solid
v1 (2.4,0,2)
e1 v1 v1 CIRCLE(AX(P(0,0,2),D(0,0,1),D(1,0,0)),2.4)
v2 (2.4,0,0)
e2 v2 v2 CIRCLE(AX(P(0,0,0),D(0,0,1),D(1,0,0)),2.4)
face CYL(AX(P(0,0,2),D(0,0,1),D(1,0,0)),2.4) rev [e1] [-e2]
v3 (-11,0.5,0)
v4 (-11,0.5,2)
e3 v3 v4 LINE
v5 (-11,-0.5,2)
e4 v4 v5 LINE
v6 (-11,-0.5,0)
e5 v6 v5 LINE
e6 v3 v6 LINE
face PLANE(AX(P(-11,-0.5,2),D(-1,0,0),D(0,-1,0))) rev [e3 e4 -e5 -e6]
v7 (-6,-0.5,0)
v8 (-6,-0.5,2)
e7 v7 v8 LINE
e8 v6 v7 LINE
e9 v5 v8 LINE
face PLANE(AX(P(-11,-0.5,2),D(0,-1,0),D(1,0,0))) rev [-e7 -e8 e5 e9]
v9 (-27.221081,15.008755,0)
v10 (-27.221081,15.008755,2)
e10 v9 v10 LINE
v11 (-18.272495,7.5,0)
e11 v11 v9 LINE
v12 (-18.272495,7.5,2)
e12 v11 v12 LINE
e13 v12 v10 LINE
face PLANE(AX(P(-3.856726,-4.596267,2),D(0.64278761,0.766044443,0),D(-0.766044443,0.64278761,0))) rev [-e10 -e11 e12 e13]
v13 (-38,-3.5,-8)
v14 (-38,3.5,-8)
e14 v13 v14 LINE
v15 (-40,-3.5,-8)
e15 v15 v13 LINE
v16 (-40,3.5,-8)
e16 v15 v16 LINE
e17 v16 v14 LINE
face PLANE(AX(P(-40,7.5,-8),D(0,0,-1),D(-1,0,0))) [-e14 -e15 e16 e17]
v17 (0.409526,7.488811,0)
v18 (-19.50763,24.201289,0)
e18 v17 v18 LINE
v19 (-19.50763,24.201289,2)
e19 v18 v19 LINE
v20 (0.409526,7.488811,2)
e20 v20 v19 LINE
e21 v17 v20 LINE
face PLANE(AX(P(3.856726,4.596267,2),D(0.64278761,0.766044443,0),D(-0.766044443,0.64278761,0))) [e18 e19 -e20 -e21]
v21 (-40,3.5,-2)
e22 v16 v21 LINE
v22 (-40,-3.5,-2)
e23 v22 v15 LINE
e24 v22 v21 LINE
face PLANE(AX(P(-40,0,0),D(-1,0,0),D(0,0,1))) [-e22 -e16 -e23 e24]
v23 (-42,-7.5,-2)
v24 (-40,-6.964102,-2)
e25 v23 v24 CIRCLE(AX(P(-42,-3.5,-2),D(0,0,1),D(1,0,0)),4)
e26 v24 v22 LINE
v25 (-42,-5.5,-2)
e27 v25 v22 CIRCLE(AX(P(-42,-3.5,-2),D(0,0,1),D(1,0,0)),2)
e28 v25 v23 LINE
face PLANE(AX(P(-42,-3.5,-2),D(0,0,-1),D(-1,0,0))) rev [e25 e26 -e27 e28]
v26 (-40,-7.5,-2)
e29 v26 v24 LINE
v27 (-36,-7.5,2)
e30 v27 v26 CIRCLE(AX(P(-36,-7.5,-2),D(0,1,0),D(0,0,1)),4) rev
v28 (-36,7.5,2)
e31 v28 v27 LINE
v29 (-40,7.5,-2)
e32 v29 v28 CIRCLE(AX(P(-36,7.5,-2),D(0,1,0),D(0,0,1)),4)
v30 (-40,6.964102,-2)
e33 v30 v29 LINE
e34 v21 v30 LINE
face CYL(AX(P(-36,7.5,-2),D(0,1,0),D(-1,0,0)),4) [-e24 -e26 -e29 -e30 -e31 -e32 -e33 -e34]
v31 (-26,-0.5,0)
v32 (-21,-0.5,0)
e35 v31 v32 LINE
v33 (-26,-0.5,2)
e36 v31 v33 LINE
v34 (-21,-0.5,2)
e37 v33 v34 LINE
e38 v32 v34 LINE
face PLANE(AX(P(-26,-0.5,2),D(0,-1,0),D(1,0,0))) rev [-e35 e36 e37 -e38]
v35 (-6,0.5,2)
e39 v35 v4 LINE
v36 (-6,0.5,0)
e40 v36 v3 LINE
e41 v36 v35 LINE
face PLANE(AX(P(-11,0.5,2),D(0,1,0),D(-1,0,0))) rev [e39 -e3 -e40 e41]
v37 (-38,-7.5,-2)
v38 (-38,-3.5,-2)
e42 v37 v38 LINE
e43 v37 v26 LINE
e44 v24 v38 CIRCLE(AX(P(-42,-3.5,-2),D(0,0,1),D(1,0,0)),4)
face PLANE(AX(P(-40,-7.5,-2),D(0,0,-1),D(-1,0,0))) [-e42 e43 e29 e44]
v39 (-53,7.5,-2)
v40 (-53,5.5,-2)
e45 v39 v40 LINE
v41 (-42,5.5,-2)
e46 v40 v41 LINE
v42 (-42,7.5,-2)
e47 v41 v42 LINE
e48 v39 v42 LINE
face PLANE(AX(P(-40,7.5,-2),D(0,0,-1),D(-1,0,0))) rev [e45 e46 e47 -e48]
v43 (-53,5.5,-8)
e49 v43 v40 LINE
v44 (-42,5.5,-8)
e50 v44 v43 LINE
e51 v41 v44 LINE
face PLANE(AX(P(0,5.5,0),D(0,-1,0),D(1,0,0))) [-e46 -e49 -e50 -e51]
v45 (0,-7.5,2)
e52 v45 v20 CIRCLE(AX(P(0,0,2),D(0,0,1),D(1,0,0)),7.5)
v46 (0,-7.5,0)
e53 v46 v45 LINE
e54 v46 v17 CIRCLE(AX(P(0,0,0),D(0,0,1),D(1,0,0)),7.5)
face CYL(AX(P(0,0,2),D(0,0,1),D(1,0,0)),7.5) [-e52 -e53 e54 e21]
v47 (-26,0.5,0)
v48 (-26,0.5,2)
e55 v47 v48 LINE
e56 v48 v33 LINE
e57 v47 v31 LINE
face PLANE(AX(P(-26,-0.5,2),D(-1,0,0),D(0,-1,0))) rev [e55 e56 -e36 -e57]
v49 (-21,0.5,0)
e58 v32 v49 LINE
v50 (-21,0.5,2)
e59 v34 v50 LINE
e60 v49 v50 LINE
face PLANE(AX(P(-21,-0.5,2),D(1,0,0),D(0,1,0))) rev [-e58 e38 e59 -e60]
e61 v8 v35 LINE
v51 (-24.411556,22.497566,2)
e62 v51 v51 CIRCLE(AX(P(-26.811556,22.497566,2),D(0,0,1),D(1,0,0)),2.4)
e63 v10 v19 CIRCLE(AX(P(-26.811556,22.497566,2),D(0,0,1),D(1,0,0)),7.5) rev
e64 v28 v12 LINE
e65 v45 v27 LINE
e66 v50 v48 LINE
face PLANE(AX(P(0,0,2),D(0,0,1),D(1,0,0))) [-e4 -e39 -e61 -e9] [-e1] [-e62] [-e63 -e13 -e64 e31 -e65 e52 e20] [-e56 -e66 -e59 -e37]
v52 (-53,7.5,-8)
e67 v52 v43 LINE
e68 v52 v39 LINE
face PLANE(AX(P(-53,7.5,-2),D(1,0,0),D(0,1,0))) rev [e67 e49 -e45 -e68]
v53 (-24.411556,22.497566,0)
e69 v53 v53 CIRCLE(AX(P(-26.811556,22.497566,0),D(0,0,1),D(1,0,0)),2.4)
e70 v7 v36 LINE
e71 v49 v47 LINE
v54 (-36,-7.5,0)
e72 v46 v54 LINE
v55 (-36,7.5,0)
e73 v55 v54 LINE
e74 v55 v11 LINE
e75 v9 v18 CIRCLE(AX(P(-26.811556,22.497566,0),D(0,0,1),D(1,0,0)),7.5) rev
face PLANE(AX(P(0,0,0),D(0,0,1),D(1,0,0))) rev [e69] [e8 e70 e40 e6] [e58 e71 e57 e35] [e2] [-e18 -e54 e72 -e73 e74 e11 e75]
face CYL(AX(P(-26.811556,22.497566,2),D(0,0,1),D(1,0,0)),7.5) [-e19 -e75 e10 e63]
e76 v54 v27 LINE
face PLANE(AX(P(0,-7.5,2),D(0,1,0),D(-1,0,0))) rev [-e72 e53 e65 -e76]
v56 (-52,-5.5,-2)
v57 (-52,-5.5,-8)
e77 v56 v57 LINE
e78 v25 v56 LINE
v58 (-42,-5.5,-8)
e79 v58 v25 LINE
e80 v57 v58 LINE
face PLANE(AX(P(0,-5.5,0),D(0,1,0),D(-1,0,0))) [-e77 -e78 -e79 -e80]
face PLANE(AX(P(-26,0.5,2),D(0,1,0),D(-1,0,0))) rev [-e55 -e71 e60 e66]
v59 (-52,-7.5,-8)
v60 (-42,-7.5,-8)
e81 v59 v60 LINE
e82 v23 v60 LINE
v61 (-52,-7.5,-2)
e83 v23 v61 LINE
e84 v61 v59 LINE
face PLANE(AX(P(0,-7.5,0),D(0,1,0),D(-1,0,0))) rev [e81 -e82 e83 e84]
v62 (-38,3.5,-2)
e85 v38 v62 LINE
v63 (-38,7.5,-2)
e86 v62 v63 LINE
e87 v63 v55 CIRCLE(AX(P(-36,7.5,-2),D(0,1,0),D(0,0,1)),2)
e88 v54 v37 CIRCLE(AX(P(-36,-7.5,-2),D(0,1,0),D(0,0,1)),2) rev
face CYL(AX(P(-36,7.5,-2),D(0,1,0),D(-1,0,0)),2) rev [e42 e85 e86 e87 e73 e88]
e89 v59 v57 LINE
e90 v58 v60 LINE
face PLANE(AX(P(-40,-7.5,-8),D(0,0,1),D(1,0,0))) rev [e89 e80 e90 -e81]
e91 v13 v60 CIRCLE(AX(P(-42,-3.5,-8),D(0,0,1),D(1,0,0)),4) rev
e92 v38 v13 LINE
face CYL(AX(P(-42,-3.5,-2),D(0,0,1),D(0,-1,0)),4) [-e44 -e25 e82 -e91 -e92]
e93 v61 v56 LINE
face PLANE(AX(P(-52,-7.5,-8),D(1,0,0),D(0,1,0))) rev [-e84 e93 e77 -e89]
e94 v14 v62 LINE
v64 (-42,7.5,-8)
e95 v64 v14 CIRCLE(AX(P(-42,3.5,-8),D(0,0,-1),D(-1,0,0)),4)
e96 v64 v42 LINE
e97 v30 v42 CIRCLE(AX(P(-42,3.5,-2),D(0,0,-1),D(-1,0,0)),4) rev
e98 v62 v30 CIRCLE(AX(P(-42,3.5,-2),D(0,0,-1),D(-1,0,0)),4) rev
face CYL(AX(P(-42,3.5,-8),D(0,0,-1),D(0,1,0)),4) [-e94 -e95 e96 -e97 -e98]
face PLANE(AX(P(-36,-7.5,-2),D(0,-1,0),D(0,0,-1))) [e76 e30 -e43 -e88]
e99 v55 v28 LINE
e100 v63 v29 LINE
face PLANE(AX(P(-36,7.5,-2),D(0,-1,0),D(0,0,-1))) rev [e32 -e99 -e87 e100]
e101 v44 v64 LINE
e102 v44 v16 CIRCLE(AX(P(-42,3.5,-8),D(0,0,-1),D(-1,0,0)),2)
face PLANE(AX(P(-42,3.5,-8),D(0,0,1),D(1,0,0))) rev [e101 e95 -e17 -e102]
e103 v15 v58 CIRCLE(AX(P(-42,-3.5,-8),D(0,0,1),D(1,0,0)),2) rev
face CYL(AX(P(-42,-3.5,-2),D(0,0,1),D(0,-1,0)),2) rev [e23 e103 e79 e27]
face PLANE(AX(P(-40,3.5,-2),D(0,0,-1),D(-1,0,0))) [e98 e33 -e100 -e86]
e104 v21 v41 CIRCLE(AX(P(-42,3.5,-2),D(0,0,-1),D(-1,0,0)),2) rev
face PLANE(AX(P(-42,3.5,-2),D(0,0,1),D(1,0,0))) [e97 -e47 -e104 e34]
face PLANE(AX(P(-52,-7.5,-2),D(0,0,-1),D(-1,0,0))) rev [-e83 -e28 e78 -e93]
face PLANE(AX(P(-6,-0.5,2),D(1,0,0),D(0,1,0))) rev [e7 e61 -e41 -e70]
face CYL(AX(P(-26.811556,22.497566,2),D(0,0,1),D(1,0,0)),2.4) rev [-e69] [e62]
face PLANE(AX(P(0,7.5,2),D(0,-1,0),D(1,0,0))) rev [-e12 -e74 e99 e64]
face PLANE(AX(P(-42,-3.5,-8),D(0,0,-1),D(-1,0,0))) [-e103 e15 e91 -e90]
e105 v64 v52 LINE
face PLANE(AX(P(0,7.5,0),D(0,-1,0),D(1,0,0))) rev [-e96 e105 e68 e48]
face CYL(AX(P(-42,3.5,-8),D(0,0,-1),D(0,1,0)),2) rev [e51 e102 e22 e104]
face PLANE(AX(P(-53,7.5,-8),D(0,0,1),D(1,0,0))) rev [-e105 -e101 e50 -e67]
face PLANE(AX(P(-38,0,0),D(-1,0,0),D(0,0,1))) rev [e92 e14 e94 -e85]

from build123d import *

# Parameters (mm, degrees)
SKETCH1_R                    = 2.4
BOSS_EXTRUDE1_DEPTH          = 2
SKETCH2_W                    = 5
SKETCH2_H                    = 1
CUT_EXTRUDE1_DEPTH           = 51.038525021
EDGE_FLANGE1_STRIP_W         = 12
EDGE_FLANGE1_STRIP_H         = 2
EDGE_FLANGE1_STRIP_CUT_DEPTH = 15
EDGE_FLANGE1_DEPTH           = 15
EDGE_FLANGE2_STRIP_W         = 12
EDGE_FLANGE2_STRIP_H         = 2
EDGE_FLANGE2_STRIP_CUT_DEPTH = 6
EDGE_FLANGE2_DEPTH           = 6
EDGE_FLANGE3_STRIP_W         = 12
EDGE_FLANGE3_STRIP_H         = 2
EDGE_FLANGE3_STRIP_CUT_DEPTH = 6
EDGE_FLANGE3_DEPTH           = 6


# Sheet-metal steps are written as plain solids
with BuildPart() as part:
    # Sketch1 → Boss-Extrude1 (new body)
    with BuildSketch(Plane.XY):
        with BuildLine():
            Line((0.409525664, 7.488810902), (-19.507629857, 24.201288754))
            ThreePointArc((-19.507629857, 24.201288754), (-32.556888833, 27.318473412), (-27.221081173, 15.008755437))
            Line((-27.221081173, 15.008755437), (-18.272494906, 7.5))
            Line((-18.272494906, 7.5), (-40, 7.5))
            Line((-40, 7.5), (-40, -7.5))
            Line((-40, -7.5), (0, -7.5))
            ThreePointArc((0, -7.5), (7.497202204, -0.204839245), (0.409525664, 7.488810902))
        make_face()
        Circle(SKETCH1_R, mode=Mode.SUBTRACT)
        with Locations((-26.811555509, 22.497566339)):
            Circle(SKETCH1_R, mode=Mode.SUBTRACT)
    extrude(amount=BOSS_EXTRUDE1_DEPTH)

    # Sketch2 → Cut-Extrude1 (cut, through all)
    with BuildSketch(Plane.XY.offset(2)):
        with Locations((-23.5, 0)):
            Rectangle(SKETCH2_W, SKETCH2_H)
        with Locations((-8.5, 0)):
            Rectangle(SKETCH2_W, SKETCH2_H)
    extrude(amount=-CUT_EXTRUDE1_DEPTH, mode=Mode.SUBTRACT)

    # Edge-Flange1 strip (across the edge) → Edge-Flange1 strip cut (cut)
    with BuildSketch(Plane(origin=(-40, -7.5, 0), x_dir=(1, 0, 0), z_dir=(0, 1, 0))):
        with Locations((-2, -1)):
            Rectangle(EDGE_FLANGE1_STRIP_W, EDGE_FLANGE1_STRIP_H)
    extrude(amount=EDGE_FLANGE1_STRIP_CUT_DEPTH, mode=Mode.SUBTRACT)

    # Edge-Flange1 section (across the edge) → Edge-Flange1 (add)
    with BuildSketch(Plane(origin=(-40, -7.5, 0), x_dir=(1, 0, 0), z_dir=(0, 1, 0))):
        with BuildLine():
            Line((0, 2), (0, 8))
            Line((0, 8), (2, 8))
            Line((2, 8), (2, 2))
            ThreePointArc((2, 2), (2.585786438, 0.585786438), (4, 0))
            Line((4, 0), (4, -2))
            ThreePointArc((4, -2), (1.171572875, -0.828427125), (0, 2))
        make_face()
    extrude(amount=EDGE_FLANGE1_DEPTH)

    # Edge-Flange2 strip (across the edge) → Edge-Flange2 strip cut (cut)
    with BuildSketch(Plane(origin=(-40, 7.5, -2), x_dir=(0, -1, 0), z_dir=(0, 0, -1))):
        with Locations((-2, -1)):
            Rectangle(EDGE_FLANGE2_STRIP_W, EDGE_FLANGE2_STRIP_H)
    extrude(amount=EDGE_FLANGE2_STRIP_CUT_DEPTH, mode=Mode.SUBTRACT)

    # Edge-Flange2 section (across the edge) → Edge-Flange2 (add)
    with BuildSketch(Plane(origin=(-40, 7.5, -2), x_dir=(0, -1, 0), z_dir=(0, 0, -1))):
        with BuildLine():
            Line((0, 2), (0, 13))
            Line((0, 13), (2, 13))
            Line((2, 13), (2, 2))
            ThreePointArc((2, 2), (2.585786438, 0.585786438), (4, 0))
            Line((4, 0), (4, -2))
            ThreePointArc((4, -2), (1.171572875, -0.828427125), (0, 2))
        make_face()
    extrude(amount=EDGE_FLANGE2_DEPTH)

    # Edge-Flange3 strip (across the edge) → Edge-Flange3 strip cut (cut)
    with BuildSketch(Plane(origin=(-40, -7.5, -8), x_dir=(0, 1, 0), z_dir=(0, 0, 1))):
        with Locations((-2, -1)):
            Rectangle(EDGE_FLANGE3_STRIP_W, EDGE_FLANGE3_STRIP_H)
    extrude(amount=EDGE_FLANGE3_STRIP_CUT_DEPTH, mode=Mode.SUBTRACT)

    # Edge-Flange3 section (across the edge) → Edge-Flange3 (add)
    with BuildSketch(Plane(origin=(-40, -7.5, -8), x_dir=(0, 1, 0), z_dir=(0, 0, 1))):
        with BuildLine():
            Line((0, 2), (0, 12))
            Line((0, 12), (2, 12))
            Line((2, 12), (2, 2))
            ThreePointArc((2, 2), (2.585786438, 0.585786438), (4, 0))
            Line((4, 0), (4, -2))
            ThreePointArc((4, -2), (1.171572875, -0.828427125), (0, 2))
        make_face()
    extrude(amount=EDGE_FLANGE3_DEPTH)


solid = part.part
